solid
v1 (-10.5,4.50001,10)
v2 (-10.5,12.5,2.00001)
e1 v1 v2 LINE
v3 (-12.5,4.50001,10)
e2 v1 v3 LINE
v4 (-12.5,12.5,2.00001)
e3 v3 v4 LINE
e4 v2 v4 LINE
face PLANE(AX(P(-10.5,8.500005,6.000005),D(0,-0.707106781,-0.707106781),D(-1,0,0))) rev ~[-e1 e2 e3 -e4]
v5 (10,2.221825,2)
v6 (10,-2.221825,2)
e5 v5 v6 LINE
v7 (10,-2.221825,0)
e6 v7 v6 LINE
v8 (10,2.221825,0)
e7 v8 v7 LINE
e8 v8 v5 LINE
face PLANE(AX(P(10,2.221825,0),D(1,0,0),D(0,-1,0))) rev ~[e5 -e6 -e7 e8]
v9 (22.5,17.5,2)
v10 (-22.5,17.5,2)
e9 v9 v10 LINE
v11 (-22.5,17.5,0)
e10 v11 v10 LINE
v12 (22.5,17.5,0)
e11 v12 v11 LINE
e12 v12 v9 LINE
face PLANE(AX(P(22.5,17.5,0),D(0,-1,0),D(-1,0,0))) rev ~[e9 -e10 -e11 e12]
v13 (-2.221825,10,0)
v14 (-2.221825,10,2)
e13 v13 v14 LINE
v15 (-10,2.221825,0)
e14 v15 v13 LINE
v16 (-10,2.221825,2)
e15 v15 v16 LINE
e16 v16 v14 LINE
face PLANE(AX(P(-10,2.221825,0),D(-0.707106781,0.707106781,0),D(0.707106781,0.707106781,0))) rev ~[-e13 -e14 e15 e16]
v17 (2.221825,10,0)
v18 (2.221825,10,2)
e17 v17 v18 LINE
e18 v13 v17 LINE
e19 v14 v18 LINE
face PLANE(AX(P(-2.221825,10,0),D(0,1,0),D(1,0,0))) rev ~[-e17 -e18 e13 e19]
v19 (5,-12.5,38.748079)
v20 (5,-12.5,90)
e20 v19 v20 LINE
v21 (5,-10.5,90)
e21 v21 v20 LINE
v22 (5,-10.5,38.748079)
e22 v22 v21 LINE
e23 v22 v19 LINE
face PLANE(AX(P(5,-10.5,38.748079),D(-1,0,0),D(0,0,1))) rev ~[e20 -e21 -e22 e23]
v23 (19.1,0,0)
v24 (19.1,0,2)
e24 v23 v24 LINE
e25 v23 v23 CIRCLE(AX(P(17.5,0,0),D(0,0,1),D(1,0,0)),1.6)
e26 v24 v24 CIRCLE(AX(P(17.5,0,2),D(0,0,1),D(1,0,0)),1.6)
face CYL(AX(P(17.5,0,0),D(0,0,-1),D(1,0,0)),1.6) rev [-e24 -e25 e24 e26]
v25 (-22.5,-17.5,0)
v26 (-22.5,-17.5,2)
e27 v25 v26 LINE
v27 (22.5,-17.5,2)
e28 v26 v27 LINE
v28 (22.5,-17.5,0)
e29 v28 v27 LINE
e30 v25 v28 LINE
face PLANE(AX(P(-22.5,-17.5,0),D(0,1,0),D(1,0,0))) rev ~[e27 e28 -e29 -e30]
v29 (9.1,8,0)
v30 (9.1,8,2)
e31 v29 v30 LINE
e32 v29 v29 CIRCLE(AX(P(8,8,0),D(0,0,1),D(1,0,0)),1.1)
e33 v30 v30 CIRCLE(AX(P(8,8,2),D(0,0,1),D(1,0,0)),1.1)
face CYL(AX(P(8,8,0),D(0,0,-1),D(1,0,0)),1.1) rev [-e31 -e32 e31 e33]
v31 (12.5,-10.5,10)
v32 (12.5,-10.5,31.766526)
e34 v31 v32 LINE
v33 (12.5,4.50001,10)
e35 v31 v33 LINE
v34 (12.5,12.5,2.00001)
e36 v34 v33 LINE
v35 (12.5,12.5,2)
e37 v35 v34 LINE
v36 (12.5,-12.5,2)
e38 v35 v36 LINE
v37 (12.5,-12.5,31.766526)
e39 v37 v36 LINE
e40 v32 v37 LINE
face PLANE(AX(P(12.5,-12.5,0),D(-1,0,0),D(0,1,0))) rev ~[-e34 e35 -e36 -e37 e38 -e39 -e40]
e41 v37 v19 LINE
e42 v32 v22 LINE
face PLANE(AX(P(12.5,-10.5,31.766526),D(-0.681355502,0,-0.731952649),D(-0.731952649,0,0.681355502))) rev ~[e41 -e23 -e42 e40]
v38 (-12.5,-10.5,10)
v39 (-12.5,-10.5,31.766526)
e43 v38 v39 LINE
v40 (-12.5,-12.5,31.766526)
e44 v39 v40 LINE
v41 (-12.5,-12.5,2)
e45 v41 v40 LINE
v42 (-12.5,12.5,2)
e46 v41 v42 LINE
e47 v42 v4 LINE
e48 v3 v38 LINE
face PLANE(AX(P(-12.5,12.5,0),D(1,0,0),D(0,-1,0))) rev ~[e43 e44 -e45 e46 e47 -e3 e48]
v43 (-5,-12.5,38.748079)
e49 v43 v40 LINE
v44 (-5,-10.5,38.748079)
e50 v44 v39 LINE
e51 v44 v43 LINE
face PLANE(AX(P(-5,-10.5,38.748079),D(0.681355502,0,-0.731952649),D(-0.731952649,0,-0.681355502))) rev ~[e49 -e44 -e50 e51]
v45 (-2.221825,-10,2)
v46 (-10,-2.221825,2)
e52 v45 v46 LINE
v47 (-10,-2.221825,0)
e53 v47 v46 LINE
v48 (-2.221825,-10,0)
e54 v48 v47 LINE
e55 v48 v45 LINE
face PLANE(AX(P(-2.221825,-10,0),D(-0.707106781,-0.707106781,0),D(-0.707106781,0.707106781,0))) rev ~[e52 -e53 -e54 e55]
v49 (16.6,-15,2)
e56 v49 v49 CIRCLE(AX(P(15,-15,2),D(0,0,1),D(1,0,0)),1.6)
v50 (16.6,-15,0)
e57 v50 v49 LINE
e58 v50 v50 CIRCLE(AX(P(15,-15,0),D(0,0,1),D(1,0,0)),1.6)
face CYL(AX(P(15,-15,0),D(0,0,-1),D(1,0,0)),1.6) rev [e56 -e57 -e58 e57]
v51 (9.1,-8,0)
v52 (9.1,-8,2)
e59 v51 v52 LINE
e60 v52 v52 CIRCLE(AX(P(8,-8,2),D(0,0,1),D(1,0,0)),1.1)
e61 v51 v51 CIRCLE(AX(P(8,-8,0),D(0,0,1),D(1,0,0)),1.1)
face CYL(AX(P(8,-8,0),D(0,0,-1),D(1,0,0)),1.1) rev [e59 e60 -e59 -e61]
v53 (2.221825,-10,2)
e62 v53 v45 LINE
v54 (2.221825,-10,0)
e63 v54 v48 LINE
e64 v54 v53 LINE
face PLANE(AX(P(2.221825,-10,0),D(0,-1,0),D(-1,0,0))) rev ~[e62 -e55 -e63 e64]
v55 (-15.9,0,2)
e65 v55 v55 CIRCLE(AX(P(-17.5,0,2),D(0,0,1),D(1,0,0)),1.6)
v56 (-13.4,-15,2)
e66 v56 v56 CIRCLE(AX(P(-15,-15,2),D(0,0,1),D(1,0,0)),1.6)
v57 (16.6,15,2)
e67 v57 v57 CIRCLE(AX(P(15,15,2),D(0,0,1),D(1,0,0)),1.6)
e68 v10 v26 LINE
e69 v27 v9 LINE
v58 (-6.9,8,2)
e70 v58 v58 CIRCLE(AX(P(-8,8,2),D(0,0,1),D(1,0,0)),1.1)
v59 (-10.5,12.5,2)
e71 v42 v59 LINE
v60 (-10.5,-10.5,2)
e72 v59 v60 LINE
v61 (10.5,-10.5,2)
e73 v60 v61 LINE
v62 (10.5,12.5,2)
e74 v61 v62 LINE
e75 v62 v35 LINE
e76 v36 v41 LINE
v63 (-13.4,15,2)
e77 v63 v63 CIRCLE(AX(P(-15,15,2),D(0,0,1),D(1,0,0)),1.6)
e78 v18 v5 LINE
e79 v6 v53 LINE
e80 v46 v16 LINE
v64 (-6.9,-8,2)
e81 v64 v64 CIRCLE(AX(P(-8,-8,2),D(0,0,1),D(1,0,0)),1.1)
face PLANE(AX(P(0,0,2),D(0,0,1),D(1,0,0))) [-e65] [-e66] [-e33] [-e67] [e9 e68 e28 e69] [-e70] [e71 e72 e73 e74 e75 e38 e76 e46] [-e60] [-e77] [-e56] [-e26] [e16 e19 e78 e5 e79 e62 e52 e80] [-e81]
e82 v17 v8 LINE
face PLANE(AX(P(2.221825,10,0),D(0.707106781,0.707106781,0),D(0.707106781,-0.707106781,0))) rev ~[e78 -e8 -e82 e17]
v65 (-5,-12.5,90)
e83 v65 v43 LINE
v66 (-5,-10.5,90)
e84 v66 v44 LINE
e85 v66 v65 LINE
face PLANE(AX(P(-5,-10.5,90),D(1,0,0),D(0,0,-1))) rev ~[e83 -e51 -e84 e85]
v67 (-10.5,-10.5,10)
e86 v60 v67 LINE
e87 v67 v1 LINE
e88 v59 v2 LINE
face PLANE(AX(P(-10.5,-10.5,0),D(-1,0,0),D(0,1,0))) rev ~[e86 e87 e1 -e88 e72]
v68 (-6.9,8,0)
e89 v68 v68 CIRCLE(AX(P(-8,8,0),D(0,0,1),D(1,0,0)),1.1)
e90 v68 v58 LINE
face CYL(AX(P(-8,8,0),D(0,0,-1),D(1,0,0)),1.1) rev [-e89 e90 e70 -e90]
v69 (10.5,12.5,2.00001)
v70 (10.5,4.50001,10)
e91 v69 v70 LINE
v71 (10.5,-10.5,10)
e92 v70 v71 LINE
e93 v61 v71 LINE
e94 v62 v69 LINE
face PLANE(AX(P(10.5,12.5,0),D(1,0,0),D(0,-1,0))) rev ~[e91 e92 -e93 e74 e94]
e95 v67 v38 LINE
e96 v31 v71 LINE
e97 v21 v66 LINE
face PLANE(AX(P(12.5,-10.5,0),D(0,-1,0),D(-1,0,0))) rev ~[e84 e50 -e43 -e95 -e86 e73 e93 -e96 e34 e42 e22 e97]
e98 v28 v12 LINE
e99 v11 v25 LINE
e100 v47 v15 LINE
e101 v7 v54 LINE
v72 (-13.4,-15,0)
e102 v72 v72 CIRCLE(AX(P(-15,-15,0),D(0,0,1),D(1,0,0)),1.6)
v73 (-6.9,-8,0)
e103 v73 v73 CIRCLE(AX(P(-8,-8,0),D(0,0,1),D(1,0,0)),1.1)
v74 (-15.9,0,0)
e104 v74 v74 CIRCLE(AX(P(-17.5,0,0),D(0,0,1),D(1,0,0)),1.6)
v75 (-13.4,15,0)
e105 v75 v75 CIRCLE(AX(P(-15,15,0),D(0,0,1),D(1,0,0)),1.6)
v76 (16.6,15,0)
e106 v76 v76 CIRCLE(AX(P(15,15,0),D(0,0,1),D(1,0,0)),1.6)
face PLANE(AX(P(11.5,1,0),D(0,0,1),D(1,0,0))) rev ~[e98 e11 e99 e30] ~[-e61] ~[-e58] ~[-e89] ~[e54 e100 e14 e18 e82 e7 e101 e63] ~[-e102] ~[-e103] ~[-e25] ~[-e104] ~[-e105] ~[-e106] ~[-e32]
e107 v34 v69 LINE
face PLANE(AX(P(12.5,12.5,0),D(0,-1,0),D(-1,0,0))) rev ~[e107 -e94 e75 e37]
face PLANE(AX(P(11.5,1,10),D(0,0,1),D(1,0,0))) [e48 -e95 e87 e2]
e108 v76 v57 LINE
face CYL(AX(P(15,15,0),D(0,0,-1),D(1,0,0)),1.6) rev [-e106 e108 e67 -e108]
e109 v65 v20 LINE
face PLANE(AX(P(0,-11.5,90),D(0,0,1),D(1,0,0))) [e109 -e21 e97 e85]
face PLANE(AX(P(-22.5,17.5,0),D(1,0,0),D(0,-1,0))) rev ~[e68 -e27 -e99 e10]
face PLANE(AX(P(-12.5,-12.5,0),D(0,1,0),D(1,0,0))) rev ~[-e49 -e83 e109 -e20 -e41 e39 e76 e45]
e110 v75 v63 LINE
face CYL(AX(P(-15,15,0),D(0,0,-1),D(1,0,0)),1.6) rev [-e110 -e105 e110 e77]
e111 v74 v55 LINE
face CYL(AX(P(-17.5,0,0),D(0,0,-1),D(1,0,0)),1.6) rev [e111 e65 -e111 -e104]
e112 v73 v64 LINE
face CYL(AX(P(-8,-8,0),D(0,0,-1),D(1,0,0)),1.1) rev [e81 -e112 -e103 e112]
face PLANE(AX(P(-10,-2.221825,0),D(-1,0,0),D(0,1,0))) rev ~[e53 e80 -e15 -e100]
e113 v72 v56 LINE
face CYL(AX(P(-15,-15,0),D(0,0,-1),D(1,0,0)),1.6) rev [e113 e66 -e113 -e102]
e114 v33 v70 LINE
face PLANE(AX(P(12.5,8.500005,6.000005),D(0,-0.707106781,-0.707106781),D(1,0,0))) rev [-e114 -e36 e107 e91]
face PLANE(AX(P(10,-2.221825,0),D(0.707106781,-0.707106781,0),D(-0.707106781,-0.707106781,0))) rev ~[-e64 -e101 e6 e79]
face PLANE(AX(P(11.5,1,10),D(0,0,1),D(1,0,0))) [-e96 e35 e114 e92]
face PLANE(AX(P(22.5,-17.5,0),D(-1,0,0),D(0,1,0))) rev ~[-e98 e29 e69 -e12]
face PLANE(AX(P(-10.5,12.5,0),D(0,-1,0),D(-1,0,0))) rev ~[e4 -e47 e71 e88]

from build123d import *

# Parameters (mm, degrees)
F1_W     = 21
F1_H     = 21
F1_R     = 1.1
F1_H_2   = 2
F1_W_2   = 10
F1_H_3   = 15
F1_R_2   = 1.6
F2_DEPTH = 2
F3_DEPTH = 90
F4_DEPTH = 10
F5_SIZE  = 7.99999
F7_DEPTH = 25


# Not quite as in the source:
# - a fillet or chamfer is up to 0.001 mm smaller than in the source, because OpenCascade refuses the exact size


with BuildPart() as f2:
    # F1 (on Top) → F2 (new body)
    with BuildSketch(Plane.XY):
        Rectangle(F1_W, F1_H)
        with Locations((-8, -8)):
            Circle(F1_R, mode=Mode.SUBTRACT)
        with Locations((8, -8)):
            Circle(F1_R, mode=Mode.SUBTRACT)
        with Locations((-8, 8)):
            Circle(F1_R, mode=Mode.SUBTRACT)
        Polygon((-10, 2.2218254069), (-2.2218254069, 10), (2.2218254069, 10), (10, 2.2218254069), (10, -2.2218254069), (2.2218254069, -10), (-2.2218254069, -10), (-10, -2.2218254069), align=None, mode=Mode.SUBTRACT)
        with Locations((8, 8)):
            Circle(F1_R, mode=Mode.SUBTRACT)
        Polygon((-10.5, 12.5), (-12.5, 12.5), (-12.5, 7.8503944539), (-12.5, -7.1496055461), (-12.5, -10.5), (-10.5, -10.5), (-10.5, 10.5), align=None)
        with Locations((0, 11.5)):
            Rectangle(F1_W, F1_H_2)
        Polygon((12.5, 12.5), (10.5, 12.5), (10.5, 10.5), (10.5, -10.5), (12.5, -10.5), (12.5, -7.1496055461), (12.5, 7.8503944539), align=None)
        with Locations((-17.5, 0.3503944539)):
            Rectangle(F1_W_2, F1_H_3)
        with Locations((-17.5, 0)):
            Circle(F1_R_2, mode=Mode.SUBTRACT)
        with Locations((17.5, 0.3503944539)):
            Rectangle(F1_W_2, F1_H_3)
        with Locations((17.5, 0)):
            Circle(F1_R_2, mode=Mode.SUBTRACT)
        Polygon((-12.5, 7.8503944539), (-12.5, 12.5), (-10.5, 12.5), (10.5, 12.5), (12.5, 12.5), (12.5, 7.8503944539), (22.5, 7.8503944539), (22.5, 17.5), (-22.5, 17.5), (-22.5, 7.8503944539), align=None)
        with Locations((-15, 15)):
            Circle(F1_R_2, mode=Mode.SUBTRACT)
        with Locations((15, 15)):
            Circle(F1_R_2, mode=Mode.SUBTRACT)
        Polygon((-12.5, -10.5), (-12.5, -7.1496055461), (-22.5, -7.1496055461), (-22.5, -17.5), (22.5, -17.5), (22.5, -7.1496055461), (12.5, -7.1496055461), (12.5, -10.5), (12.5, -12.5), (-12.5, -12.5), align=None)
        with Locations((-15, -15)):
            Circle(F1_R_2, mode=Mode.SUBTRACT)
        with Locations((15, -15)):
            Circle(F1_R_2, mode=Mode.SUBTRACT)
        Polygon((10.5, -10.5), (-10.5, -10.5), (-12.5, -10.5), (-12.5, -12.5), (12.5, -12.5), (12.5, -10.5), align=None)
    extrude(amount=F2_DEPTH)

    # F1 (on Top) → F3 (join)
    with BuildSketch(Plane.XY):
        Polygon((10.5, -10.5), (-10.5, -10.5), (-12.5, -10.5), (-12.5, -12.5), (12.5, -12.5), (12.5, -10.5), align=None)
    extrude(amount=F3_DEPTH)

    # F1 (on Top) → F4 (join)
    with BuildSketch(Plane.XY):
        Polygon((12.5, 12.5), (10.5, 12.5), (10.5, 10.5), (10.5, -10.5), (12.5, -10.5), (12.5, -7.1496055461), (12.5, 7.8503944539), align=None)
        Polygon((-10.5, 12.5), (-12.5, 12.5), (-12.5, 7.8503944539), (-12.5, -7.1496055461), (-12.5, -10.5), (-10.5, -10.5), (-10.5, 10.5), align=None)
        Polygon((10.5, -10.5), (-10.5, -10.5), (-12.5, -10.5), (-12.5, -12.5), (12.5, -12.5), (12.5, -10.5), align=None)
    extrude(amount=F4_DEPTH)

    # F5 (size 8 in the source; OpenCascade refuses exactly that, so slightly less here)
    f5_edges = [f2.edges().sort_by_distance(p)[0] for p in [
        (11.5, 12.5, 10),
        (-11.5, 12.5, 10),
    ]]
    chamfer(f5_edges, length=F5_SIZE)

    # F6 (on face) → F7 (cut)
    with BuildSketch(Plane(origin=(0, -10.5, 0), x_dir=(-1, 0, 0), z_dir=(0, 1, 0))):
        Polygon((-12.5, 90), (-12.5, 31.766526401), (-5, 38.7480794755), (-5, 90), align=None)
        Polygon((5, 38.7480794755), (12.5, 31.766526401), (12.5, 90), (5, 90), align=None)
    extrude(amount=-F7_DEPTH, mode=Mode.SUBTRACT)


solid = f2.part
